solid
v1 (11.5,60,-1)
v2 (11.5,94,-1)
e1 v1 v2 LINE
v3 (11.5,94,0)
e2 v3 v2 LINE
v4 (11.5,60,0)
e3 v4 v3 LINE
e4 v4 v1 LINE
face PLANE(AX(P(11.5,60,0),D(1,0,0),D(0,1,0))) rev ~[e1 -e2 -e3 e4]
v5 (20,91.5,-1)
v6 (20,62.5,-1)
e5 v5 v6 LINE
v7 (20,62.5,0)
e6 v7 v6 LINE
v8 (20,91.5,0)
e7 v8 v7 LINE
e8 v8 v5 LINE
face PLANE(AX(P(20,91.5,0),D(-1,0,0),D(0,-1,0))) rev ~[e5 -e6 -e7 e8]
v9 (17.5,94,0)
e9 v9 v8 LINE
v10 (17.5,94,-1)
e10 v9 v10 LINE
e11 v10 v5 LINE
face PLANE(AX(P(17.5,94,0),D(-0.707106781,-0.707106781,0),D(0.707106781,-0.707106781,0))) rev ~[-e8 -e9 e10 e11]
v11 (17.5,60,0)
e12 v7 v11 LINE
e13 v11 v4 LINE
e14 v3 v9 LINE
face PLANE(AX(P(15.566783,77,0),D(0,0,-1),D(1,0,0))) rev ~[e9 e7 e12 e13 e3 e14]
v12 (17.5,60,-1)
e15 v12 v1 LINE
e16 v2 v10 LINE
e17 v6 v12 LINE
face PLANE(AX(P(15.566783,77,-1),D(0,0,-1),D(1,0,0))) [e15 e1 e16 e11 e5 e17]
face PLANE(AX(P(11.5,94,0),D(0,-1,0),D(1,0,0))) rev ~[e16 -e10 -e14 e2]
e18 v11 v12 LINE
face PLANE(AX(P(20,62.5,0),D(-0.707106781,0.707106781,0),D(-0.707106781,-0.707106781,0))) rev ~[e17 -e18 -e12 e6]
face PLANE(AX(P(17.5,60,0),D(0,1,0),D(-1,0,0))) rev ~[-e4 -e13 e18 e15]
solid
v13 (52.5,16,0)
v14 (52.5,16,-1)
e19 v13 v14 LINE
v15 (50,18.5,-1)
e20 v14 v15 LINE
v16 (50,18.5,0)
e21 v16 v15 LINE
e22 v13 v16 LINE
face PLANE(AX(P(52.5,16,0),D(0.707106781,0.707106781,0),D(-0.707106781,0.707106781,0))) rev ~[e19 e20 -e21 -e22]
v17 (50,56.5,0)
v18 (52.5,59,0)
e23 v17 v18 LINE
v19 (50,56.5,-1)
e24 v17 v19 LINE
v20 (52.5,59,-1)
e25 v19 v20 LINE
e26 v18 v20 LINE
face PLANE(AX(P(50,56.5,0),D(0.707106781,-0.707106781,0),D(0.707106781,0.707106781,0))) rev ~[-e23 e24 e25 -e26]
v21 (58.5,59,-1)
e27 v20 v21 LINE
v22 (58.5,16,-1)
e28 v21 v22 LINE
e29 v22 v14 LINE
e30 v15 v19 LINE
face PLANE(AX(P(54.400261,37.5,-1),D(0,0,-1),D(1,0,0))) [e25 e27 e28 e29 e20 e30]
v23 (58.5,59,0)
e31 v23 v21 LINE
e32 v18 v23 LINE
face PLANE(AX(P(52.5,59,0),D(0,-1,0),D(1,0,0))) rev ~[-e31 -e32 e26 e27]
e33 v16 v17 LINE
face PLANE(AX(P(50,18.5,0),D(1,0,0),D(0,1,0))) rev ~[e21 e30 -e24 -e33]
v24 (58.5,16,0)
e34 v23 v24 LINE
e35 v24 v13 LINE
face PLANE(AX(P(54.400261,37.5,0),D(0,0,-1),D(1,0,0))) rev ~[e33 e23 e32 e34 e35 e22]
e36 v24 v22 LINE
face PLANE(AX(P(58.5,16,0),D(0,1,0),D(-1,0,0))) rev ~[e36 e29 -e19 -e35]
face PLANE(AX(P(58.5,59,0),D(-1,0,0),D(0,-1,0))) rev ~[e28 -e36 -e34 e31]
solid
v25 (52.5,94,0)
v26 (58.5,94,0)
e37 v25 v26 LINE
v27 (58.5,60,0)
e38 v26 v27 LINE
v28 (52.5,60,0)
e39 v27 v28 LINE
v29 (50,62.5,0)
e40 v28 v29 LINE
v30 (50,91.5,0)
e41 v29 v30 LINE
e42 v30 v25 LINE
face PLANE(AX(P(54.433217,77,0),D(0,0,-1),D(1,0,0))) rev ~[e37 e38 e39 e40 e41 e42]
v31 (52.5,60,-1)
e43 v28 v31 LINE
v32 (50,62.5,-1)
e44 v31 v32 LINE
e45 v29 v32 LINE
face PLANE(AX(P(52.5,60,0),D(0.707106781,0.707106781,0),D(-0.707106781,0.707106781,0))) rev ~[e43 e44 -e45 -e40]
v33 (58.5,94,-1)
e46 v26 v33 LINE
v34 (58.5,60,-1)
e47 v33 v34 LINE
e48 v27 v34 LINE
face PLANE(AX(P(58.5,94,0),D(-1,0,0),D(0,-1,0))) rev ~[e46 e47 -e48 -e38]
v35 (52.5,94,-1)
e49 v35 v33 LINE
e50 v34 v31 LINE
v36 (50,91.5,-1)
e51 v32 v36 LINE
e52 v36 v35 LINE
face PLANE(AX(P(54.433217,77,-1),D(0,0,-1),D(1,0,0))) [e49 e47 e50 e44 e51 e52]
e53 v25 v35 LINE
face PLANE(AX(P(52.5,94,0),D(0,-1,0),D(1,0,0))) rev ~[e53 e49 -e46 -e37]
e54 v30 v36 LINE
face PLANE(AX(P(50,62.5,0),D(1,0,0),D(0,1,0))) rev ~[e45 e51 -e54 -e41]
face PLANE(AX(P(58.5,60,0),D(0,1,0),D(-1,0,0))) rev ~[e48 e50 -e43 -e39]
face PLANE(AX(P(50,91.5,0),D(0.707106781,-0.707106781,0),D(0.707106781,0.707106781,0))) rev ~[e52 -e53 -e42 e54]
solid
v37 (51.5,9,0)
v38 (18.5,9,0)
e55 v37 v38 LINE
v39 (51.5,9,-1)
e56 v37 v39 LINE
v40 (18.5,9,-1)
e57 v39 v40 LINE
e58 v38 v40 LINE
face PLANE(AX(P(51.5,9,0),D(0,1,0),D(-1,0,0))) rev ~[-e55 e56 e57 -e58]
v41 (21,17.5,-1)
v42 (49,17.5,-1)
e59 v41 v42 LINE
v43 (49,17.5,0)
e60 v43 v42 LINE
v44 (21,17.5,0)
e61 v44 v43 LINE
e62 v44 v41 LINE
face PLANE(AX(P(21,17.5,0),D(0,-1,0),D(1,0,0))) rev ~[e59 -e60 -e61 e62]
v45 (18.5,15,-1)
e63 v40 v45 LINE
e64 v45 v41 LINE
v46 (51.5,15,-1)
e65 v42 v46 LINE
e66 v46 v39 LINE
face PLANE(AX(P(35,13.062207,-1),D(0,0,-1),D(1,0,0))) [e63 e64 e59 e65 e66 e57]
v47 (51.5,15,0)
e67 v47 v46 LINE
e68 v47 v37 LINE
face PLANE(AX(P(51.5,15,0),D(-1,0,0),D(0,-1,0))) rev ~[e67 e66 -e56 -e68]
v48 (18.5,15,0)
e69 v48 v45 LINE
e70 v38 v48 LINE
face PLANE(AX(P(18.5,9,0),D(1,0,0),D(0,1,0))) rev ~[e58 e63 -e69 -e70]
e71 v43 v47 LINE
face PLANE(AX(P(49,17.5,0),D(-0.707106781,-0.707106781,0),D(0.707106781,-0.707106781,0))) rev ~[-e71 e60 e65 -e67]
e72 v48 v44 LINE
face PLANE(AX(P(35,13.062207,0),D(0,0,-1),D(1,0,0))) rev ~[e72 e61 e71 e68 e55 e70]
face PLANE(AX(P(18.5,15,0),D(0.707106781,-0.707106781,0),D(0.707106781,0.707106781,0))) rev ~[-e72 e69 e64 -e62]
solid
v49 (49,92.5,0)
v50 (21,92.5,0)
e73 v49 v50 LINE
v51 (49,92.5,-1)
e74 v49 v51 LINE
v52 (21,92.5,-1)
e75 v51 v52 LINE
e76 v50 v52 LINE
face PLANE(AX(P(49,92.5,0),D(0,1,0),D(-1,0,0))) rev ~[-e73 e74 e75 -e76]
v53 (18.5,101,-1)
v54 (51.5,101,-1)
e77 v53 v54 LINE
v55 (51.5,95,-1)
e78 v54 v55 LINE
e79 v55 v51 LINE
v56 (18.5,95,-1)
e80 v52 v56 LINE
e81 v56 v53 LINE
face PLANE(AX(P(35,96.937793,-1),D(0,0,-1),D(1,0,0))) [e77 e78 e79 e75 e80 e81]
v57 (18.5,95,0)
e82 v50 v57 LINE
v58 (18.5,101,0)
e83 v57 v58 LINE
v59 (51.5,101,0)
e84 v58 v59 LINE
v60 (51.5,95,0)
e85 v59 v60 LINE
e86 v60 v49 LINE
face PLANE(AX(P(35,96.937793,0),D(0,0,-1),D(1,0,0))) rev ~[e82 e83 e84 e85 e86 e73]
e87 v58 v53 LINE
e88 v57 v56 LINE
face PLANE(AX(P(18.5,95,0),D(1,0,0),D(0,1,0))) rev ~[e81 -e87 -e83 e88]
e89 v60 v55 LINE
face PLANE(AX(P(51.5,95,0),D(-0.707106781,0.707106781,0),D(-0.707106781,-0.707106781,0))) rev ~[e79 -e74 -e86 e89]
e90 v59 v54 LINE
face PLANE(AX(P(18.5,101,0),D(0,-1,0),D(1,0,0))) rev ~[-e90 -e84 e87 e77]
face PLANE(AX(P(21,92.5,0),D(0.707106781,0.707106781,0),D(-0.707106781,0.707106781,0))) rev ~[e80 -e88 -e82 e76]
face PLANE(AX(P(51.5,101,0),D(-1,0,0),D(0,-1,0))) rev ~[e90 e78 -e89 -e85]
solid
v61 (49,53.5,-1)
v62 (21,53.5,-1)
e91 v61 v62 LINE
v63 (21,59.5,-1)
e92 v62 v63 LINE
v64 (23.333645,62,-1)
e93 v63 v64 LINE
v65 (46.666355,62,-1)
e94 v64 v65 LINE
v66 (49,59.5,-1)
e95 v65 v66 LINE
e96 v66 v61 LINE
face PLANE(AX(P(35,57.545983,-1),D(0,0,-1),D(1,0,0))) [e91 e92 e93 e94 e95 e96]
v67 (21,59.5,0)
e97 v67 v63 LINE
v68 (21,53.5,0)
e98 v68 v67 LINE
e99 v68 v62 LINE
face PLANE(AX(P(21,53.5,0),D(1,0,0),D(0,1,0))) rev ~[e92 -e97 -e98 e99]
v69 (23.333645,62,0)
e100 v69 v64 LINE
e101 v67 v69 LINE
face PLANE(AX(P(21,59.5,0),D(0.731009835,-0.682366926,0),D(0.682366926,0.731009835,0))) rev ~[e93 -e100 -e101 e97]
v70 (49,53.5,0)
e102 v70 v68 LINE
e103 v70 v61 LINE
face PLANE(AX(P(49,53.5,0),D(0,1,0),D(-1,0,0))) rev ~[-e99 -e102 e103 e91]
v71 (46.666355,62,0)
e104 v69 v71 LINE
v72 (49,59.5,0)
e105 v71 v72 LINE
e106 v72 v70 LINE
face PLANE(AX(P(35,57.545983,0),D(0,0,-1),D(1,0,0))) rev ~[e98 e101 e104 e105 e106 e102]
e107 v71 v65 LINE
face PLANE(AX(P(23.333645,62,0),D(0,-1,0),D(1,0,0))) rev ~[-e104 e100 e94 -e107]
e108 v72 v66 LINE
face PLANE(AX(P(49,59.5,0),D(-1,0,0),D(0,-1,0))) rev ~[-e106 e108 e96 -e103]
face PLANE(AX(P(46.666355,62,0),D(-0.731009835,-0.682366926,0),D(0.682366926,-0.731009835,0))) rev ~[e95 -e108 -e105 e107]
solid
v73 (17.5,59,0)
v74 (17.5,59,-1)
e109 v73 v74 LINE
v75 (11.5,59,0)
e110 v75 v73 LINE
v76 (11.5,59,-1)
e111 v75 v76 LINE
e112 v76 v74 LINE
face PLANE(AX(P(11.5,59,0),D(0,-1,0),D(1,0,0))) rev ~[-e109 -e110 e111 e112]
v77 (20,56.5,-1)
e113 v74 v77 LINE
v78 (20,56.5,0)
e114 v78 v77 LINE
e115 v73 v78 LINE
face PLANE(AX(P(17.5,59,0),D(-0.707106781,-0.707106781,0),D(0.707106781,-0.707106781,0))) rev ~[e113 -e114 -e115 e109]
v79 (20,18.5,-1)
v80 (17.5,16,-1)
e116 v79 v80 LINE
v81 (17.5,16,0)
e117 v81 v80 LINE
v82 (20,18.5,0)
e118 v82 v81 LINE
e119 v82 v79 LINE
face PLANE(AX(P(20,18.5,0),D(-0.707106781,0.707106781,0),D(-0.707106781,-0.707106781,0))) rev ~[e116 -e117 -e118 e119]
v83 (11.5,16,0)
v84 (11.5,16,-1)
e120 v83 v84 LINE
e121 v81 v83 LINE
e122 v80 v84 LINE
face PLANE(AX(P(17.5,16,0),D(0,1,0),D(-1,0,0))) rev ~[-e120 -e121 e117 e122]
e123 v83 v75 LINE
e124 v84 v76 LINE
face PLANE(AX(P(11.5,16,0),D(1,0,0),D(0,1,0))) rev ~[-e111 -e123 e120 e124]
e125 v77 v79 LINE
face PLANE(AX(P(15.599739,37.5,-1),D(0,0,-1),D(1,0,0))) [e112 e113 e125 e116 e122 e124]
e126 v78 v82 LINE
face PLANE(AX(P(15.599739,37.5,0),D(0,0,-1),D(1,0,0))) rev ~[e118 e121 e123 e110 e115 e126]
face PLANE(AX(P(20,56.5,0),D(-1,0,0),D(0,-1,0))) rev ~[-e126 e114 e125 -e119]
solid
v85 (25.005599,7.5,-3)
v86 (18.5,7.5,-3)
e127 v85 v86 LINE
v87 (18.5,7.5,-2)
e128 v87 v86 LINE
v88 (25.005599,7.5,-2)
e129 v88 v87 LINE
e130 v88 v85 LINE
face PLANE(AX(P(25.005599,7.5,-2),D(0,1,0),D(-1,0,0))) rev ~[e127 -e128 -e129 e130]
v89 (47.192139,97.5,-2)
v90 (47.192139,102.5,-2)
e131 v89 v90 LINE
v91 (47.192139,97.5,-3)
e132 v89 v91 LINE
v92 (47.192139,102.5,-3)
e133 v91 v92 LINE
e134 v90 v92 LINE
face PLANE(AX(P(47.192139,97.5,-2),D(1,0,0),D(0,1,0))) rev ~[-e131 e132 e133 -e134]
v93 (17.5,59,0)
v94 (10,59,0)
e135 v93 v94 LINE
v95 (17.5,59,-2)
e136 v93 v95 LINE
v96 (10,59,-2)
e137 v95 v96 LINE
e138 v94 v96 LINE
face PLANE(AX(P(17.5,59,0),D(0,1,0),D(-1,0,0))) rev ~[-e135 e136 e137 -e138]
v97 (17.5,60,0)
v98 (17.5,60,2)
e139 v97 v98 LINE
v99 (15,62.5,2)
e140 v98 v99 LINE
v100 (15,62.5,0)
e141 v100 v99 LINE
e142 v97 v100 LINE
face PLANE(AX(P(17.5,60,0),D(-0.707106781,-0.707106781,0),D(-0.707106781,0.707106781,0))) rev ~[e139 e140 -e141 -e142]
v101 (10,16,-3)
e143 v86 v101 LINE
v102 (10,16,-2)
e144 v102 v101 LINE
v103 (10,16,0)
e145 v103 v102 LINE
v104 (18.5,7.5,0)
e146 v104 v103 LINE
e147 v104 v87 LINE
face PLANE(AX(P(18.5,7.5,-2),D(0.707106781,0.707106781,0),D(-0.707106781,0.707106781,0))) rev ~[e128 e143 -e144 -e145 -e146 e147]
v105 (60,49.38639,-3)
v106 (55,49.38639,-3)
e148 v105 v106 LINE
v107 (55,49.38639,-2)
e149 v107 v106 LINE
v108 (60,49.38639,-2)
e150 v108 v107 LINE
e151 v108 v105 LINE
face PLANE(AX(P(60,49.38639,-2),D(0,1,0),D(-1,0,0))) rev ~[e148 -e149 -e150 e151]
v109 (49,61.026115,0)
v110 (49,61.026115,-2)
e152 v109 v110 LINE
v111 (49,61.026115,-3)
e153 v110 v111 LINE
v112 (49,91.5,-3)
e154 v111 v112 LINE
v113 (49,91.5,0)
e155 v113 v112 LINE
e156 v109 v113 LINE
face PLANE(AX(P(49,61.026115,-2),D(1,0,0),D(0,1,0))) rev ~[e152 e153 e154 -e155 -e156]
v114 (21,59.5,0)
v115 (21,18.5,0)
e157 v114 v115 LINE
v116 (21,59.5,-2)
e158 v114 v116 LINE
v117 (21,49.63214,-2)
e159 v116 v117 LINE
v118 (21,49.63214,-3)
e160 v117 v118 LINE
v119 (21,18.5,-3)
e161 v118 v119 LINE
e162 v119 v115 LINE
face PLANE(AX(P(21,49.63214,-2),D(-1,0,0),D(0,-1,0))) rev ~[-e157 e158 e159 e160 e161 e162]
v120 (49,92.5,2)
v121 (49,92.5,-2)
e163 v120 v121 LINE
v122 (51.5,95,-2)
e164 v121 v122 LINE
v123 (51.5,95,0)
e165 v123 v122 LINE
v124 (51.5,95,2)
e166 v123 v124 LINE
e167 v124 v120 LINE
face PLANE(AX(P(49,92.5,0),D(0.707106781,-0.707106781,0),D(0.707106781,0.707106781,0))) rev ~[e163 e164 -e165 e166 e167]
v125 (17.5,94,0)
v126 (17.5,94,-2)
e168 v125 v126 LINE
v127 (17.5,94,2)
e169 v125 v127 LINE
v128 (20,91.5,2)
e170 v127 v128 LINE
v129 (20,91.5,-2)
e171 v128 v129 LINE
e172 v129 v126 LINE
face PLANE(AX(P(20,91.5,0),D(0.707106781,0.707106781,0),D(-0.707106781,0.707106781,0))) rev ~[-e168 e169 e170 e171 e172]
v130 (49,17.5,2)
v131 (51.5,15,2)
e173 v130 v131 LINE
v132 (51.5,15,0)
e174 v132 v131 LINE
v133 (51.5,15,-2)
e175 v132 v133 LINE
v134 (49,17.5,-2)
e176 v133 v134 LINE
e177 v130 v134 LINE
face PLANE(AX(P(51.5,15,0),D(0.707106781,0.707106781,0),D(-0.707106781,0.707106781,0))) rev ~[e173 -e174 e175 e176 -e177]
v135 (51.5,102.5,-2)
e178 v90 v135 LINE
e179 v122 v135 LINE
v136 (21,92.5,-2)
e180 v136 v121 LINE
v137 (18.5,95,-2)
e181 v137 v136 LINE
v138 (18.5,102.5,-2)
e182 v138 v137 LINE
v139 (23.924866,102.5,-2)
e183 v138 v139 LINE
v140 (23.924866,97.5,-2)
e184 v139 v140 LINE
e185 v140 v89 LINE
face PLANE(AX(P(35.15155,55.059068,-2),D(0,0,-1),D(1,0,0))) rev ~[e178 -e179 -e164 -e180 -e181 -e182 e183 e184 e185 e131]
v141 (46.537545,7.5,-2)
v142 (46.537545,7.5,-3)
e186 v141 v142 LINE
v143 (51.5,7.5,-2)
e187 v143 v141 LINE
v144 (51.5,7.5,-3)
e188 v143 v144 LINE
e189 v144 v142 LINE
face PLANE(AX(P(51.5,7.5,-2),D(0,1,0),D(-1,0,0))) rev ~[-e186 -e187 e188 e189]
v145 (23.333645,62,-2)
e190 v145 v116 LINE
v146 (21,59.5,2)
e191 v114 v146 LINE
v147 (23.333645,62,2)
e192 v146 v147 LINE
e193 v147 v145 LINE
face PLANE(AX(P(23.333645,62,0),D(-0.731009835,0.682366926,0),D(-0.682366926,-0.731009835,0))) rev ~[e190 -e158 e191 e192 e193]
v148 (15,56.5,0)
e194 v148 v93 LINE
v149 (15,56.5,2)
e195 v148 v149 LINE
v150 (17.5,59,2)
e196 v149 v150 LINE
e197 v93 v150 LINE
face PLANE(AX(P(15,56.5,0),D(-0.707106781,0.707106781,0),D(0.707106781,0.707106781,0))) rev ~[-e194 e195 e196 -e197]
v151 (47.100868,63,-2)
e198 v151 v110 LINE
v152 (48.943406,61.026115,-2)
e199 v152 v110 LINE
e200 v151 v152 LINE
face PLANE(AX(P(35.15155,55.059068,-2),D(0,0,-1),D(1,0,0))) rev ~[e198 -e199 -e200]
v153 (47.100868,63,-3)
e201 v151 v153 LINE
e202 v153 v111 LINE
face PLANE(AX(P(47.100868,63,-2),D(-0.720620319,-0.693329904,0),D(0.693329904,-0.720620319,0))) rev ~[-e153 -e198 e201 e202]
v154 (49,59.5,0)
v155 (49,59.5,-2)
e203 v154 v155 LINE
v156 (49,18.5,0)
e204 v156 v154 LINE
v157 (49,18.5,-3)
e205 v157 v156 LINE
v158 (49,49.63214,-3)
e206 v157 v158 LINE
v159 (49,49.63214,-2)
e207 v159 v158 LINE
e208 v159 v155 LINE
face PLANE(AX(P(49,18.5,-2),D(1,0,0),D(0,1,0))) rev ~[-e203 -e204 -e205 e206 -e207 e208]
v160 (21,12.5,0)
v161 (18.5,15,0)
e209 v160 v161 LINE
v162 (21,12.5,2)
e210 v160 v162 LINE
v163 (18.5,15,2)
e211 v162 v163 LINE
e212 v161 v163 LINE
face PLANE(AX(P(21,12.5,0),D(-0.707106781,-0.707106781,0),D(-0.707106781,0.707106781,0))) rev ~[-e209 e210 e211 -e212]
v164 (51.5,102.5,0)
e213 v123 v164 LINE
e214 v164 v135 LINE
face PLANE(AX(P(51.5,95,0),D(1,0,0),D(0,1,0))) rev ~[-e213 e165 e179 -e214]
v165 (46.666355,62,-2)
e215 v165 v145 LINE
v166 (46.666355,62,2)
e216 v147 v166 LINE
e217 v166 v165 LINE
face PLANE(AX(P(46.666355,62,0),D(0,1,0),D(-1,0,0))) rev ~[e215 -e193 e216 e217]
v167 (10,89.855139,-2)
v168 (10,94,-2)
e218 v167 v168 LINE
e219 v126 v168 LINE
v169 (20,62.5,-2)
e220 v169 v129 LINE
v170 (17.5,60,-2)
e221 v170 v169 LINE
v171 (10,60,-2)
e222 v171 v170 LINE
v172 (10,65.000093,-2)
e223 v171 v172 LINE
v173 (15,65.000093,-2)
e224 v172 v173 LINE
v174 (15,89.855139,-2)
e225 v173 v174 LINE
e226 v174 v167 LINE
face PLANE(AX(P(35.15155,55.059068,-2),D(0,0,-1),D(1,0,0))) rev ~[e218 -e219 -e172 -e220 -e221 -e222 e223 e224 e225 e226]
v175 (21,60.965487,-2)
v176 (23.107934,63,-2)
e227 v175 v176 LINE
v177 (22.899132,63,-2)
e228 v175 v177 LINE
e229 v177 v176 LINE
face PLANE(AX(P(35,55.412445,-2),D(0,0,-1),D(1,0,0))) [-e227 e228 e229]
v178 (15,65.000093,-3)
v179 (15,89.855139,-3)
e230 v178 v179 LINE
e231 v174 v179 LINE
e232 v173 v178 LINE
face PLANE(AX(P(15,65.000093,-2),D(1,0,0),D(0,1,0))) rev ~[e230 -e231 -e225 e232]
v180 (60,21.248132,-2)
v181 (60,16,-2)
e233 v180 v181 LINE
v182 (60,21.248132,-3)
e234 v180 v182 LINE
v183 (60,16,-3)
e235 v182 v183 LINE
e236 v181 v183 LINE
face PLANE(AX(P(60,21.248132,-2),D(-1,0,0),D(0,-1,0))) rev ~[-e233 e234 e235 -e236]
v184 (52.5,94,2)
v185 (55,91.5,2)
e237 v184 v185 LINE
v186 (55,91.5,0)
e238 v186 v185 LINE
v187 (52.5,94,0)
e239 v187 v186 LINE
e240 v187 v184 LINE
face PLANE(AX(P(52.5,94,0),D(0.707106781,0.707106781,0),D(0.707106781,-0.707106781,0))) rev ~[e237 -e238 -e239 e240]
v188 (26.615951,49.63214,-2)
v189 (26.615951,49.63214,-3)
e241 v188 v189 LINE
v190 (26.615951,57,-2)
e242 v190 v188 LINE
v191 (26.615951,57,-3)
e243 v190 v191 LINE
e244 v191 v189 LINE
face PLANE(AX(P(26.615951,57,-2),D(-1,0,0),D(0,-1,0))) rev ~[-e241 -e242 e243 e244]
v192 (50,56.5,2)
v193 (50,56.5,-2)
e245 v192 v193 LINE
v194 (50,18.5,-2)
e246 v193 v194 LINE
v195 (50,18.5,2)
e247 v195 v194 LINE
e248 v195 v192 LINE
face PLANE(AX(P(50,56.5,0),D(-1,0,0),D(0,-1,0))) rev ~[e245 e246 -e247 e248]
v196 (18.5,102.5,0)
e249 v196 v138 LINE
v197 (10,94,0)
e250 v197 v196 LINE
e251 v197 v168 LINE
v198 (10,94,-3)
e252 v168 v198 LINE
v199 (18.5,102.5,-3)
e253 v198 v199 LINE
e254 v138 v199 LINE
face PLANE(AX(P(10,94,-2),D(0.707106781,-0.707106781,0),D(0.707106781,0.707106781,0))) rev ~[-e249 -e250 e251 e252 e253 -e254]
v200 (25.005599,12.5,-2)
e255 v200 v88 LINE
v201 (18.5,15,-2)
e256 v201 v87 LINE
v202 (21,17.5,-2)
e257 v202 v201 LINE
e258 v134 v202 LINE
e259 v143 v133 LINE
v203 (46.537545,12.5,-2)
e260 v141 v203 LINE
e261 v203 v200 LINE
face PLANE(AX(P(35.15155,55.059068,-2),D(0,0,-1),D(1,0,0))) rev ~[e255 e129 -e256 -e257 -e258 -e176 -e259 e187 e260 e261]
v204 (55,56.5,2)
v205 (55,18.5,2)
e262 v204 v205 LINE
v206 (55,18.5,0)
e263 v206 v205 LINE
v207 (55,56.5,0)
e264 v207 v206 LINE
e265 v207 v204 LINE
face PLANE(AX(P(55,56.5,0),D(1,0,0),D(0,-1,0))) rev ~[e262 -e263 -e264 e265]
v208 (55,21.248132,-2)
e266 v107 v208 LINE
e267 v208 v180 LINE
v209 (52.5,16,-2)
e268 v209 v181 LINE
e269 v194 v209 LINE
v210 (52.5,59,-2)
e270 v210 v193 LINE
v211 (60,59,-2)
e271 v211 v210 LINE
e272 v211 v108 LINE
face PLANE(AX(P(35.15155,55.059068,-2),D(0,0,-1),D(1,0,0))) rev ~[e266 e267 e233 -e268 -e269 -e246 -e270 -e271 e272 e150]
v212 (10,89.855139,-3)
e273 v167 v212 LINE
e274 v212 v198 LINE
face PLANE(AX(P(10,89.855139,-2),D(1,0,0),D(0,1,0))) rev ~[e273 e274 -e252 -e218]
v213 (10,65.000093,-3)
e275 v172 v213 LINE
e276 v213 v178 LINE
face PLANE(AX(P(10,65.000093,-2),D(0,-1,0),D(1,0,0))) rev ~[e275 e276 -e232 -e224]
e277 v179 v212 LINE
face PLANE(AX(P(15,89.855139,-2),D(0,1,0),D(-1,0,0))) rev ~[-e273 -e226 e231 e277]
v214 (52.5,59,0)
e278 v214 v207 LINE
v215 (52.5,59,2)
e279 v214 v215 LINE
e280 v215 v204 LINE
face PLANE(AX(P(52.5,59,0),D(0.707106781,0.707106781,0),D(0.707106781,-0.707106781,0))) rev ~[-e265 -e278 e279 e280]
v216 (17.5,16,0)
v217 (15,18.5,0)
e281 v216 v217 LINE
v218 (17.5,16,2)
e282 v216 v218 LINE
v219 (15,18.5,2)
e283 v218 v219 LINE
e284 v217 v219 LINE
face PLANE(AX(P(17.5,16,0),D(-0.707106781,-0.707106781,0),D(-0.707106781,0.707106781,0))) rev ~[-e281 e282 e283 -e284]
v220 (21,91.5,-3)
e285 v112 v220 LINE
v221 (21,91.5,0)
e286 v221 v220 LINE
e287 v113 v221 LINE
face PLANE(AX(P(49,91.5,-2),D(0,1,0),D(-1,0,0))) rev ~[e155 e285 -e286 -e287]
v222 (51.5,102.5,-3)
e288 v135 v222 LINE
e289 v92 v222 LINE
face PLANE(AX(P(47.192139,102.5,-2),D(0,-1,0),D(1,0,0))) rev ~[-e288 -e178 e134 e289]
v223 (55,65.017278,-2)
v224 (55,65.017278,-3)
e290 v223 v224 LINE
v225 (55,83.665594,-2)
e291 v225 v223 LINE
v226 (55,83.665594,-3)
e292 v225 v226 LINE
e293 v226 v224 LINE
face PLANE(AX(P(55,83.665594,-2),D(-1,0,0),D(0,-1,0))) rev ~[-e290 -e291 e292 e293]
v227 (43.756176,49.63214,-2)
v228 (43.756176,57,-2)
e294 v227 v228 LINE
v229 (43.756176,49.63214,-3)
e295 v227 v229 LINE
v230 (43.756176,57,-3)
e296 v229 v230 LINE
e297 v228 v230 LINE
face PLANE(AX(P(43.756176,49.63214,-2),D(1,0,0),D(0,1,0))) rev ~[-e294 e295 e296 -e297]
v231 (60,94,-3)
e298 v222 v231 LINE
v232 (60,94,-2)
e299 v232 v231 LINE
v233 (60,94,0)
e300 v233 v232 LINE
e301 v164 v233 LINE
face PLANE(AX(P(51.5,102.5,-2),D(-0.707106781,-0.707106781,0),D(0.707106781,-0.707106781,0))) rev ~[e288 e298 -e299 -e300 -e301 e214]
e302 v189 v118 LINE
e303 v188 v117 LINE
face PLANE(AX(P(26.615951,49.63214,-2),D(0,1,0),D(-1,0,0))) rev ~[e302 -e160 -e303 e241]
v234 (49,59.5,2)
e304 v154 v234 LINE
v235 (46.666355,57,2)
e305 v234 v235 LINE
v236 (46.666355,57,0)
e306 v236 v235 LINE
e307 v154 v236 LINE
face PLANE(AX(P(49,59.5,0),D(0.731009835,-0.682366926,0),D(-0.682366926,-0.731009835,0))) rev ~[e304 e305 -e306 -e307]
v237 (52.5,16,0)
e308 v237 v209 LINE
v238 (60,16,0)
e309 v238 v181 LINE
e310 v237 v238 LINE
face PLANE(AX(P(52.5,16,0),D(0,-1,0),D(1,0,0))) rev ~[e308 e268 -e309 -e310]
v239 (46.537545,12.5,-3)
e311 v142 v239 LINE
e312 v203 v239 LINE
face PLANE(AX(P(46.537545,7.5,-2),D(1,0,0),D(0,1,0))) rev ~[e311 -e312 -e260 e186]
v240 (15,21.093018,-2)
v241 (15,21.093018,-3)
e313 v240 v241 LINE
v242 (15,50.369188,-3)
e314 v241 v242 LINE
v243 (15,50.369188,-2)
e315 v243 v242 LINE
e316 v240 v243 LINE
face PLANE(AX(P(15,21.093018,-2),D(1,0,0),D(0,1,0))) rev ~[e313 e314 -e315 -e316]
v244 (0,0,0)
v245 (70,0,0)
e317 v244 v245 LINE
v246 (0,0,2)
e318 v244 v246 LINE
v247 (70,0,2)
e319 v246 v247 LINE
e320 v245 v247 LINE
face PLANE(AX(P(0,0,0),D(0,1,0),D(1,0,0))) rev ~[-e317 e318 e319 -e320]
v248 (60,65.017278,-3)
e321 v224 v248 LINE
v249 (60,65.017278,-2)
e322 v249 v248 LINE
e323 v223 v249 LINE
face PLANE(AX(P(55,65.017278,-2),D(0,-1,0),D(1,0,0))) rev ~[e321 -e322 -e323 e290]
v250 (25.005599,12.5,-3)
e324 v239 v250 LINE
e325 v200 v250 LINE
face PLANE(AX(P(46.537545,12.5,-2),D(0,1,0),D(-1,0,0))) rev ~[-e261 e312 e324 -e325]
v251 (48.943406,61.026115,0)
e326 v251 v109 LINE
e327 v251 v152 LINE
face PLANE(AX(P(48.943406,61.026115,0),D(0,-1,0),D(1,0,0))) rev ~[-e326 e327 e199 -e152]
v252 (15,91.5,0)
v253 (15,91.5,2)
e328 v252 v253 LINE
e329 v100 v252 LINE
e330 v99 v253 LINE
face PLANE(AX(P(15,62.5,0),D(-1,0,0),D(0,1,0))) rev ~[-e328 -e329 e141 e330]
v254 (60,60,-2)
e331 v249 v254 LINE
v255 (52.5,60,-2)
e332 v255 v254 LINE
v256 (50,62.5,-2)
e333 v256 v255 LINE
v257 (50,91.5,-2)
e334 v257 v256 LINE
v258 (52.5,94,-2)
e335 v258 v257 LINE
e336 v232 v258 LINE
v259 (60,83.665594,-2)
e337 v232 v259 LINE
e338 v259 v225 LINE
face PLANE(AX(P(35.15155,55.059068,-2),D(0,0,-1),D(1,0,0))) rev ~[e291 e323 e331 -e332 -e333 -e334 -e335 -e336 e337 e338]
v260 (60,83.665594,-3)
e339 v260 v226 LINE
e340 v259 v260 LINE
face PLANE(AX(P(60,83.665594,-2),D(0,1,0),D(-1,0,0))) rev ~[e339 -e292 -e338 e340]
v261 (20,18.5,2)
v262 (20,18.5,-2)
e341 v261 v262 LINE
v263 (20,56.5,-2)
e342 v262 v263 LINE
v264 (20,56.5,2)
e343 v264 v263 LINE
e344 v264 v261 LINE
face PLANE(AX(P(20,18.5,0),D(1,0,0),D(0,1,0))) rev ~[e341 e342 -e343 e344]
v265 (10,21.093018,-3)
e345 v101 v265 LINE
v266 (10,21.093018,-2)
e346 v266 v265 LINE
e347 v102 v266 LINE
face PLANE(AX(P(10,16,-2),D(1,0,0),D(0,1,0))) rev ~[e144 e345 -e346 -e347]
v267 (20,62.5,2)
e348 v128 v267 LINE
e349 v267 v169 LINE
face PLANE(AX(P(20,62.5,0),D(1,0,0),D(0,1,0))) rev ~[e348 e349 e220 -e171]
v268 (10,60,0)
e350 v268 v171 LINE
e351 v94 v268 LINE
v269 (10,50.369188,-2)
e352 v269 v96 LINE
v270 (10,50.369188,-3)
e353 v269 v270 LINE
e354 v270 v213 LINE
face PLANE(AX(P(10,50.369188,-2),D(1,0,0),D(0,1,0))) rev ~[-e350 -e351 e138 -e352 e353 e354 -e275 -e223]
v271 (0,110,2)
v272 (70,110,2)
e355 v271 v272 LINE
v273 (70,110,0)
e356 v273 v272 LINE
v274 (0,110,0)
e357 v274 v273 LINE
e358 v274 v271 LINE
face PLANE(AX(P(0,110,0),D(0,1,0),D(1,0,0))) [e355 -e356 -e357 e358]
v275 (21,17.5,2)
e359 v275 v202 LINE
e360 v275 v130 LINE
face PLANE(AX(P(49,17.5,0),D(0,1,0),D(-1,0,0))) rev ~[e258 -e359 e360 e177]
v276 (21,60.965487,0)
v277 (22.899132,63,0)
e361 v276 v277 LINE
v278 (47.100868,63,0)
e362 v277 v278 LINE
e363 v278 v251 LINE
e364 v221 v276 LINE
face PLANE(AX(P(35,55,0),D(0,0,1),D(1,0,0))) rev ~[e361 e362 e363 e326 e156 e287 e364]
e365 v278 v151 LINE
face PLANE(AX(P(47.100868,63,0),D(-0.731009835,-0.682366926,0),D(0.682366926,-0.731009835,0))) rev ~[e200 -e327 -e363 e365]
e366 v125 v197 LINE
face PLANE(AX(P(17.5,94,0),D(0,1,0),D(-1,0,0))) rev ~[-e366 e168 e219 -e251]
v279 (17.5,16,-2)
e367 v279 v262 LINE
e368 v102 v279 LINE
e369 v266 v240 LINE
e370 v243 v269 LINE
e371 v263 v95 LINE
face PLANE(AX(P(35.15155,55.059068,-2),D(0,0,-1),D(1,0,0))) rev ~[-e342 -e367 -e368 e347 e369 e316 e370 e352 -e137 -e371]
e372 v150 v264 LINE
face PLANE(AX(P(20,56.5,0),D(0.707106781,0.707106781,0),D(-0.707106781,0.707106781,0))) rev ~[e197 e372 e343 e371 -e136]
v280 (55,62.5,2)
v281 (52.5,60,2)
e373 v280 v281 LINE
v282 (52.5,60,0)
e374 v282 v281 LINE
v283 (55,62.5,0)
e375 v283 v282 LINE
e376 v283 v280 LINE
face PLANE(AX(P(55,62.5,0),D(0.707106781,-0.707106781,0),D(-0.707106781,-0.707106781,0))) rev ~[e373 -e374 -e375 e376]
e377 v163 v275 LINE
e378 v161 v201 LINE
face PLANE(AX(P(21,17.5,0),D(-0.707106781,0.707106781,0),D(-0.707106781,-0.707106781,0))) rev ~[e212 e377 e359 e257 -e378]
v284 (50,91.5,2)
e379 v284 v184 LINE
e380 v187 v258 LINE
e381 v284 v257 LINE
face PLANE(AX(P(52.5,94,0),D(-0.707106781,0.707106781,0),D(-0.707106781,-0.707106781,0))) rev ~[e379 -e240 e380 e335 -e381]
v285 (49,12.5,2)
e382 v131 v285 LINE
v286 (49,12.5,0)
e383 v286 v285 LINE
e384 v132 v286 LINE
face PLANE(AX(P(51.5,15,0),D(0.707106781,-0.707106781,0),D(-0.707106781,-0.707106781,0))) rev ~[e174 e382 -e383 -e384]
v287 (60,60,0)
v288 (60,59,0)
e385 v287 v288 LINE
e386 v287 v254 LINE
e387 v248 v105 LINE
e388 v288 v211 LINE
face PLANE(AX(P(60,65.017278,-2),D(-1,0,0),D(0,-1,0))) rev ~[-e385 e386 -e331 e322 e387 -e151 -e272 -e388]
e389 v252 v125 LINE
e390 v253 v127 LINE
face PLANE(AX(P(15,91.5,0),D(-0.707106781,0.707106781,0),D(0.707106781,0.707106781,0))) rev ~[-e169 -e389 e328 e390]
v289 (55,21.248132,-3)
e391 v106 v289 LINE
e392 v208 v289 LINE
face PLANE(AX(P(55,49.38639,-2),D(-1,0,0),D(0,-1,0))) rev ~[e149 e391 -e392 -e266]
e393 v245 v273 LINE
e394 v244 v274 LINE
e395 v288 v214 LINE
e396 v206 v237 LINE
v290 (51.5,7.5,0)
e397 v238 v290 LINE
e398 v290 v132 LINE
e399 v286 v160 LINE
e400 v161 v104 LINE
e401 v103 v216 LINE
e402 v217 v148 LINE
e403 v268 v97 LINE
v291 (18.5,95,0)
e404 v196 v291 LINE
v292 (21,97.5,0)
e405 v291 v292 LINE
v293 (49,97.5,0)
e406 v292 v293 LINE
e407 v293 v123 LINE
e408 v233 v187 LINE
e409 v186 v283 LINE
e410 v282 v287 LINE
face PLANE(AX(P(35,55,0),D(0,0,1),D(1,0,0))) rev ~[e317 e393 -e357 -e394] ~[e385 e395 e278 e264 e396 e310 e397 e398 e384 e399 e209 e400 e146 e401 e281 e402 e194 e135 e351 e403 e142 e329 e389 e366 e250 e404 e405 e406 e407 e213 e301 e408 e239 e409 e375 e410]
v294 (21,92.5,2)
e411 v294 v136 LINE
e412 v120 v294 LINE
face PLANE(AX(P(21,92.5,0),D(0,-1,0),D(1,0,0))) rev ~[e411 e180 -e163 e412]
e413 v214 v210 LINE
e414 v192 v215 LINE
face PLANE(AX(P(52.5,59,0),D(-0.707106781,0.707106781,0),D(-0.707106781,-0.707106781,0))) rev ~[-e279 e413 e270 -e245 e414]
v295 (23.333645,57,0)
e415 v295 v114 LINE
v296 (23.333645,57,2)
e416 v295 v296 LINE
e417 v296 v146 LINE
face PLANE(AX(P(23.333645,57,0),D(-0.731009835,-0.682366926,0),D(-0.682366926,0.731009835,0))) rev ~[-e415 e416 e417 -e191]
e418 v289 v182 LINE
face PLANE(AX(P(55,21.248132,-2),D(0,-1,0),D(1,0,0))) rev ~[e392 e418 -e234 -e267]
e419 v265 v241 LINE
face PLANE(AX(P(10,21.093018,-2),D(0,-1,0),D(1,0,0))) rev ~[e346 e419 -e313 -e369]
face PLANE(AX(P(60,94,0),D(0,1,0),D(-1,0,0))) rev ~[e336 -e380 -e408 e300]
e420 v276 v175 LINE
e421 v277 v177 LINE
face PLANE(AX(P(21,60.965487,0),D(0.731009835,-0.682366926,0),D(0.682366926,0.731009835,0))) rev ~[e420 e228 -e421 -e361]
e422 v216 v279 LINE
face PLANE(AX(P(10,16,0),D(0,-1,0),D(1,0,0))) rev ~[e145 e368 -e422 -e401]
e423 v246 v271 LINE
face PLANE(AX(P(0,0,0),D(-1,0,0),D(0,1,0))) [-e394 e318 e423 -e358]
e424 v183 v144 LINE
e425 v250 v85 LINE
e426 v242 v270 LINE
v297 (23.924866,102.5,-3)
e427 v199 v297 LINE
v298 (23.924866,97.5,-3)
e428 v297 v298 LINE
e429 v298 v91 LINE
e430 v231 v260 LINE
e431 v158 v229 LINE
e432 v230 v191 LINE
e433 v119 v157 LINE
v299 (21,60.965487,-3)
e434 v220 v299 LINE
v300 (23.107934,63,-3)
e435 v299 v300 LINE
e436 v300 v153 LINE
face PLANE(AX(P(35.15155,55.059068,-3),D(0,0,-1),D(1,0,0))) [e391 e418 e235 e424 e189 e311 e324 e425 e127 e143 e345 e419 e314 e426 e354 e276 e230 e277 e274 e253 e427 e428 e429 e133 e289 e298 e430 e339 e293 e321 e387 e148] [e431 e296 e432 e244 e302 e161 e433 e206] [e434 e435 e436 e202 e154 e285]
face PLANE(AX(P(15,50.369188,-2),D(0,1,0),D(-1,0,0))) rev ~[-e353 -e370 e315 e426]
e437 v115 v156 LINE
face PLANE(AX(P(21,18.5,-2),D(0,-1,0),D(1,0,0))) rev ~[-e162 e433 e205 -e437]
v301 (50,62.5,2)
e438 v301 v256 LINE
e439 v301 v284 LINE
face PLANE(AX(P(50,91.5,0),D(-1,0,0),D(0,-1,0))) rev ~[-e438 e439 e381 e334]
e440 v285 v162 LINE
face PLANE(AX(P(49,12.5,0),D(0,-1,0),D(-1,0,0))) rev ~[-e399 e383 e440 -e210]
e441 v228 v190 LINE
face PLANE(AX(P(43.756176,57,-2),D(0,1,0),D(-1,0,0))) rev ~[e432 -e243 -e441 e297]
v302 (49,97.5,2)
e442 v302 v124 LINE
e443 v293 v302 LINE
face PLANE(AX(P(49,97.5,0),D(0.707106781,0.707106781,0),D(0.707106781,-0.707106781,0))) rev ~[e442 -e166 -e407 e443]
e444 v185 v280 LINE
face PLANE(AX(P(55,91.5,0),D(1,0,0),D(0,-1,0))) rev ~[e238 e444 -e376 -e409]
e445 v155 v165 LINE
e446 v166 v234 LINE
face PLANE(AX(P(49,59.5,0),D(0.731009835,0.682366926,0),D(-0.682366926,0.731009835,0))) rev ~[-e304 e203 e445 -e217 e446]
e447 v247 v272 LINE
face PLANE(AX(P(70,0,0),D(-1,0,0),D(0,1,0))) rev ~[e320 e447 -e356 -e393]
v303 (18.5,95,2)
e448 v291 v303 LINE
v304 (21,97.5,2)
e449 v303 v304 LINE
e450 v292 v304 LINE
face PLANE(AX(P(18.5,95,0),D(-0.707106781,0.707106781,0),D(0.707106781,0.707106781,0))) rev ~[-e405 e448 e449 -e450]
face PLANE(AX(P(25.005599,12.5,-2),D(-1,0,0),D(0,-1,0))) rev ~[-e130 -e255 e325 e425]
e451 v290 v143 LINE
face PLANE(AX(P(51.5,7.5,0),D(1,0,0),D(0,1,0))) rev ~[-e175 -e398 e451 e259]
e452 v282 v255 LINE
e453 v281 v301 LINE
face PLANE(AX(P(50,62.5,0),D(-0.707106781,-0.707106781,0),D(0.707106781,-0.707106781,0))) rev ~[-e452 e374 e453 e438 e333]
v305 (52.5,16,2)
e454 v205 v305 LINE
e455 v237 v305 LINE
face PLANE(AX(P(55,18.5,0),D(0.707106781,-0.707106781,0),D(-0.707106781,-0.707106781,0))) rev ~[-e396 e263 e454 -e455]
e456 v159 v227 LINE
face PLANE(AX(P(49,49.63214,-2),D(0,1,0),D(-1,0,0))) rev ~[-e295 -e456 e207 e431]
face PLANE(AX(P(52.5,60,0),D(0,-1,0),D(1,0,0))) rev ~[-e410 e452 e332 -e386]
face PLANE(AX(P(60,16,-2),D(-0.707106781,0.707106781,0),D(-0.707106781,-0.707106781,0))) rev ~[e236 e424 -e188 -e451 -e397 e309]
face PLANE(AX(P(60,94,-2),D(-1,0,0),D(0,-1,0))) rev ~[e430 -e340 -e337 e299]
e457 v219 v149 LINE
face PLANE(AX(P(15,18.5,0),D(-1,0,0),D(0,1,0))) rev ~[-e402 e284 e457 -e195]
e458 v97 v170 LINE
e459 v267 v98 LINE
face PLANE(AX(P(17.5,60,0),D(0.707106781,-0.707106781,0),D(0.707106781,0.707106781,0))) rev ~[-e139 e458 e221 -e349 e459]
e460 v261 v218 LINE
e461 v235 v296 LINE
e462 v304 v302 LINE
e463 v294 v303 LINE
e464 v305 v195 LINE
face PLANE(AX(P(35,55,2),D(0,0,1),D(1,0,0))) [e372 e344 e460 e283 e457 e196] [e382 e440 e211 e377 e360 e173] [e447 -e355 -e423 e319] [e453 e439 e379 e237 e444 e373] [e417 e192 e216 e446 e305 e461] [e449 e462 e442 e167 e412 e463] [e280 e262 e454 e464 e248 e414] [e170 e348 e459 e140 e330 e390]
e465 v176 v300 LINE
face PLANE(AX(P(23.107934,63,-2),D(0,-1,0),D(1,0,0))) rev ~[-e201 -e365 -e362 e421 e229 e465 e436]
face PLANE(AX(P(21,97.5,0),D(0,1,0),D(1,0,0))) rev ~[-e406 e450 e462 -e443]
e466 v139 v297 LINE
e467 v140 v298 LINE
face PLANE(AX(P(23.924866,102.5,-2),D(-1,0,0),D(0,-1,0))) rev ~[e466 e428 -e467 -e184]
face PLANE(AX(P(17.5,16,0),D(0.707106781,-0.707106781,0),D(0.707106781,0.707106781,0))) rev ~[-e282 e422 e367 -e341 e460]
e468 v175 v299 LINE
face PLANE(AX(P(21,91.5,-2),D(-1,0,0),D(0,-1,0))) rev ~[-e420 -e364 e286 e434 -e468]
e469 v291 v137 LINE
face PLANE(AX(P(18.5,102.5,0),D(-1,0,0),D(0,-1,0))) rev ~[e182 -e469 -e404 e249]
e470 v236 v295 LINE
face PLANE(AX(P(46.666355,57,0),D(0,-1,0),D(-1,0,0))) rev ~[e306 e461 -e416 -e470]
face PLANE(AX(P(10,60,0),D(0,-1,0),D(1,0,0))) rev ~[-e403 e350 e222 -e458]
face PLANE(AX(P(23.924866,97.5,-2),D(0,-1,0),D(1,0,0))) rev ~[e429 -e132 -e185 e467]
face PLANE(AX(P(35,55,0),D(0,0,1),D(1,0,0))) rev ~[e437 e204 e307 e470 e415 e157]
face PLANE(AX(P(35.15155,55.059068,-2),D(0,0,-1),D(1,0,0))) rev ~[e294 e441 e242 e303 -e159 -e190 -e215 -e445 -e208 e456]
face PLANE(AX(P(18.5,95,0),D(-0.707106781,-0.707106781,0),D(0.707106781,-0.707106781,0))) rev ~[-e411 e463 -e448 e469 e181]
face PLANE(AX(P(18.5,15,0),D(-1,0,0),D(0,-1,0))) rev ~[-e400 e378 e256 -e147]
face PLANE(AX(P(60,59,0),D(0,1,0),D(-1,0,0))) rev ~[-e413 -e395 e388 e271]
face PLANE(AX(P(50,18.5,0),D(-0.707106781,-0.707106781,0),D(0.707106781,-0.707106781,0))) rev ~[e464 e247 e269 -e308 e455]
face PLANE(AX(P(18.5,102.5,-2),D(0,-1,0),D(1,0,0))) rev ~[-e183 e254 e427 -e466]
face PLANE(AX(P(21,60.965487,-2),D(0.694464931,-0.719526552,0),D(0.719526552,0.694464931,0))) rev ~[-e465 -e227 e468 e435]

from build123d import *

# Parameters (mm, degrees)
F0_W     = 70
F0_H     = 110
F1_DEPTH = 2
F3_DEPTH = 2
F5_DEPTH = 1
F7_DEPTH = 1


# Not quite as in the source:
# - a feature names something its author has since deleted; it is built from what else it names


with BuildPart() as f1:
    # F0 (on Top) → F1 (new body)
    with BuildSketch(Plane.XY):
        with Locations((35, 55)):
            Rectangle(F0_W, F0_H)
        Polygon((20, 18.5), (17.5, 16), (15, 18.5), (15, 56.5), (17.5, 59), (20, 56.5), align=None, mode=Mode.SUBTRACT)
        Polygon((18.5, 15), (21, 17.5), (49, 17.5), (51.5, 15), (49, 12.5), (21, 12.5), align=None, mode=Mode.SUBTRACT)
        Polygon((50, 18.5), (50, 56.5), (52.5, 59), (55, 56.5), (55, 18.5), (52.5, 16), align=None, mode=Mode.SUBTRACT)
        Polygon((15, 91.5), (17.5, 94), (20, 91.5), (20, 62.5), (17.5, 60), (15, 62.5), align=None, mode=Mode.SUBTRACT)
        Polygon((23.3336448214, 57), (21, 59.5), (23.3336448214, 62), (46.6663551786, 62), (49, 59.5), (46.6663551786, 57), align=None, mode=Mode.SUBTRACT)
        Polygon((50, 91.5), (52.5, 94), (55, 91.5), (55, 62.5), (52.5, 60), (50, 62.5), align=None, mode=Mode.SUBTRACT)
        Polygon((21, 92.5), (18.5, 95), (21, 97.5), (49, 97.5), (51.5, 95), (49, 92.5), align=None, mode=Mode.SUBTRACT)
    extrude(amount=F1_DEPTH)

    # F2 (on face) → F3 (join)
    with BuildSketch(Plane(origin=(0, 0, 0), x_dir=(1, 0, 0), z_dir=(0, 0, -1))):
        Polygon((51.5, -15), (49, -17.5), (21, -17.5), (18.5, -15), (18.5, -7.5), (10, -16), (17.5, -16), (20, -18.5), (20, -56.5), (17.5, -59), (10, -59), (10, -60), (17.5, -60), (20, -62.5), (20, -91.5), (17.5, -94), (10, -94), (18.5, -102.5), (18.5, -95), (21, -92.5), (49, -92.5), (51.5, -95), (51.5, -102.5), (60, -94), (52.5, -94), (50, -91.5), (50, -62.5), (52.5, -60), (60, -60), (60, -59), (52.5, -59), (50, -56.5), (50, -18.5), (52.5, -16), (60, -16), (51.5, -7.5), align=None)
        Polygon((49, -61.0261154606), (49, -91.5), (21, -91.5), (21, -60.9654872063), (22.8991320981, -63), (47.1008679019, -63), (48.9434060753, -61.0261154606), align=None, mode=Mode.SUBTRACT)
        Polygon((21, -18.5), (49, -18.5), (49, -51.9142135624), (49, -59.5), (46.6663551786, -62), (23.3336448214, -62), (21, -59.5), (21, -51.9142135624), align=None, mode=Mode.SUBTRACT)
    extrude(amount=F3_DEPTH)

    # F4 (on face) → F5 (join)
    with BuildSketch(Plane(origin=(0, 0, -2), x_dir=(1, 0, 0), z_dir=(0, 0, -1))):
        Polygon((23.9248658717, -102.5), (23.9248658717, -97.5), (47.1921387315, -97.5), (47.1921387315, -102.5), (51.5, -102.5), (60, -94), (60, -83.6655944586), (55, -83.6655944586), (55, -65.0172777596), (60, -65.0172777596), (60, -49.3863895535), (55, -49.3863895535), (55, -21.2481319904), (60, -21.2481319904), (60, -16), (51.5, -7.5), (46.5375445783, -7.5), (46.5375445783, -12.5), (25.0055992454, -12.5), (25.0055992454, -7.5), (18.5, -7.5), (10, -16), (10, -21.093017593), (15, -21.093017593), (15, -50.3691881895), (10, -50.3691881895), (10, -65.0000932597), (15, -65.0000932597), (15, -89.8551392555), (10, -89.8551392555), (10, -94), (18.5, -102.5), align=None)
        Polygon((49, -91.5), (44.0906696022, -91.5), (21, -91.5), (21, -68.9583107835), (21, -60.9654872063), (23.1079336207, -63), (47.1008679019, -63), (49, -61.0261154606), align=None, mode=Mode.SUBTRACT)
        Polygon((21, -49.632139504), (21, -18.5), (49, -18.5), (49, -49.632139504), (43.7561757863, -49.632139504), (43.7561757863, -57), (26.6159512103, -57), (26.6159512103, -49.632139504), align=None, mode=Mode.SUBTRACT)
    extrude(amount=F5_DEPTH)


with BuildPart() as f7:
    # F6 (on face) → F7 (new body)
    with BuildSketch(Plane(origin=(0, 0, 0), x_dir=(1, 0, 0), z_dir=(0, 0, -1))):
        Polygon((49, -92.5), (21, -92.5), (18.5, -95), (18.5, -101), (51.5, -101), (51.5, -95), align=None)
    extrude(amount=F7_DEPTH)


with BuildPart() as f7b:
    # F6 (on face) → F7, piece 2 (new body)
    with BuildSketch(Plane(origin=(0, 0, 0), x_dir=(1, 0, 0), z_dir=(0, 0, -1))):
        Polygon((11.5, -94), (17.5, -94), (20, -91.5), (20, -62.5), (17.5, -60), (11.5, -60), align=None)
    extrude(amount=F7_DEPTH)


with BuildPart() as f7c:
    # F6 (on face) → F7, piece 3 (new body)
    with BuildSketch(Plane(origin=(0, 0, 0), x_dir=(1, 0, 0), z_dir=(0, 0, -1))):
        Polygon((50, -91.5), (52.5, -94), (58.5, -94), (58.5, -60), (52.5, -60), (50, -62.5), align=None)
    extrude(amount=F7_DEPTH)


with BuildPart() as f7d:
    # F6 (on face) → F7, piece 4 (new body)
    with BuildSketch(Plane(origin=(0, 0, 0), x_dir=(1, 0, 0), z_dir=(0, 0, -1))):
        Polygon((21, -53.5), (21, -59.5), (23.3336448214, -62), (46.6663551786, -62), (49, -59.5), (49, -53.5), align=None)
    extrude(amount=F7_DEPTH)


with BuildPart() as f7e:
    # F6 (on face) → F7, piece 5 (new body)
    with BuildSketch(Plane(origin=(0, 0, 0), x_dir=(1, 0, 0), z_dir=(0, 0, -1))):
        Polygon((17.5, -59), (20, -56.5), (20, -18.5), (17.5, -16), (11.5, -16), (11.5, -59), align=None)
    extrude(amount=F7_DEPTH)


with BuildPart() as f7f:
    # F6 (on face) → F7, piece 6 (new body)
    with BuildSketch(Plane(origin=(0, 0, 0), x_dir=(1, 0, 0), z_dir=(0, 0, -1))):
        Polygon((50, -18.5), (50, -56.5), (52.5, -59), (58.5, -59), (58.5, -16), (52.5, -16), align=None)
    extrude(amount=F7_DEPTH)


with BuildPart() as f7g:
    # F6 (on face) → F7, piece 7 (new body)
    with BuildSketch(Plane(origin=(0, 0, 0), x_dir=(1, 0, 0), z_dir=(0, 0, -1))):
        Polygon((18.5, -9), (18.5, -15), (21, -17.5), (49, -17.5), (51.5, -15), (51.5, -9), align=None)
    extrude(amount=F7_DEPTH)


solid = Compound([f1.part, f7.part, f7b.part, f7c.part, f7d.part, f7e.part, f7f.part, f7g.part])
